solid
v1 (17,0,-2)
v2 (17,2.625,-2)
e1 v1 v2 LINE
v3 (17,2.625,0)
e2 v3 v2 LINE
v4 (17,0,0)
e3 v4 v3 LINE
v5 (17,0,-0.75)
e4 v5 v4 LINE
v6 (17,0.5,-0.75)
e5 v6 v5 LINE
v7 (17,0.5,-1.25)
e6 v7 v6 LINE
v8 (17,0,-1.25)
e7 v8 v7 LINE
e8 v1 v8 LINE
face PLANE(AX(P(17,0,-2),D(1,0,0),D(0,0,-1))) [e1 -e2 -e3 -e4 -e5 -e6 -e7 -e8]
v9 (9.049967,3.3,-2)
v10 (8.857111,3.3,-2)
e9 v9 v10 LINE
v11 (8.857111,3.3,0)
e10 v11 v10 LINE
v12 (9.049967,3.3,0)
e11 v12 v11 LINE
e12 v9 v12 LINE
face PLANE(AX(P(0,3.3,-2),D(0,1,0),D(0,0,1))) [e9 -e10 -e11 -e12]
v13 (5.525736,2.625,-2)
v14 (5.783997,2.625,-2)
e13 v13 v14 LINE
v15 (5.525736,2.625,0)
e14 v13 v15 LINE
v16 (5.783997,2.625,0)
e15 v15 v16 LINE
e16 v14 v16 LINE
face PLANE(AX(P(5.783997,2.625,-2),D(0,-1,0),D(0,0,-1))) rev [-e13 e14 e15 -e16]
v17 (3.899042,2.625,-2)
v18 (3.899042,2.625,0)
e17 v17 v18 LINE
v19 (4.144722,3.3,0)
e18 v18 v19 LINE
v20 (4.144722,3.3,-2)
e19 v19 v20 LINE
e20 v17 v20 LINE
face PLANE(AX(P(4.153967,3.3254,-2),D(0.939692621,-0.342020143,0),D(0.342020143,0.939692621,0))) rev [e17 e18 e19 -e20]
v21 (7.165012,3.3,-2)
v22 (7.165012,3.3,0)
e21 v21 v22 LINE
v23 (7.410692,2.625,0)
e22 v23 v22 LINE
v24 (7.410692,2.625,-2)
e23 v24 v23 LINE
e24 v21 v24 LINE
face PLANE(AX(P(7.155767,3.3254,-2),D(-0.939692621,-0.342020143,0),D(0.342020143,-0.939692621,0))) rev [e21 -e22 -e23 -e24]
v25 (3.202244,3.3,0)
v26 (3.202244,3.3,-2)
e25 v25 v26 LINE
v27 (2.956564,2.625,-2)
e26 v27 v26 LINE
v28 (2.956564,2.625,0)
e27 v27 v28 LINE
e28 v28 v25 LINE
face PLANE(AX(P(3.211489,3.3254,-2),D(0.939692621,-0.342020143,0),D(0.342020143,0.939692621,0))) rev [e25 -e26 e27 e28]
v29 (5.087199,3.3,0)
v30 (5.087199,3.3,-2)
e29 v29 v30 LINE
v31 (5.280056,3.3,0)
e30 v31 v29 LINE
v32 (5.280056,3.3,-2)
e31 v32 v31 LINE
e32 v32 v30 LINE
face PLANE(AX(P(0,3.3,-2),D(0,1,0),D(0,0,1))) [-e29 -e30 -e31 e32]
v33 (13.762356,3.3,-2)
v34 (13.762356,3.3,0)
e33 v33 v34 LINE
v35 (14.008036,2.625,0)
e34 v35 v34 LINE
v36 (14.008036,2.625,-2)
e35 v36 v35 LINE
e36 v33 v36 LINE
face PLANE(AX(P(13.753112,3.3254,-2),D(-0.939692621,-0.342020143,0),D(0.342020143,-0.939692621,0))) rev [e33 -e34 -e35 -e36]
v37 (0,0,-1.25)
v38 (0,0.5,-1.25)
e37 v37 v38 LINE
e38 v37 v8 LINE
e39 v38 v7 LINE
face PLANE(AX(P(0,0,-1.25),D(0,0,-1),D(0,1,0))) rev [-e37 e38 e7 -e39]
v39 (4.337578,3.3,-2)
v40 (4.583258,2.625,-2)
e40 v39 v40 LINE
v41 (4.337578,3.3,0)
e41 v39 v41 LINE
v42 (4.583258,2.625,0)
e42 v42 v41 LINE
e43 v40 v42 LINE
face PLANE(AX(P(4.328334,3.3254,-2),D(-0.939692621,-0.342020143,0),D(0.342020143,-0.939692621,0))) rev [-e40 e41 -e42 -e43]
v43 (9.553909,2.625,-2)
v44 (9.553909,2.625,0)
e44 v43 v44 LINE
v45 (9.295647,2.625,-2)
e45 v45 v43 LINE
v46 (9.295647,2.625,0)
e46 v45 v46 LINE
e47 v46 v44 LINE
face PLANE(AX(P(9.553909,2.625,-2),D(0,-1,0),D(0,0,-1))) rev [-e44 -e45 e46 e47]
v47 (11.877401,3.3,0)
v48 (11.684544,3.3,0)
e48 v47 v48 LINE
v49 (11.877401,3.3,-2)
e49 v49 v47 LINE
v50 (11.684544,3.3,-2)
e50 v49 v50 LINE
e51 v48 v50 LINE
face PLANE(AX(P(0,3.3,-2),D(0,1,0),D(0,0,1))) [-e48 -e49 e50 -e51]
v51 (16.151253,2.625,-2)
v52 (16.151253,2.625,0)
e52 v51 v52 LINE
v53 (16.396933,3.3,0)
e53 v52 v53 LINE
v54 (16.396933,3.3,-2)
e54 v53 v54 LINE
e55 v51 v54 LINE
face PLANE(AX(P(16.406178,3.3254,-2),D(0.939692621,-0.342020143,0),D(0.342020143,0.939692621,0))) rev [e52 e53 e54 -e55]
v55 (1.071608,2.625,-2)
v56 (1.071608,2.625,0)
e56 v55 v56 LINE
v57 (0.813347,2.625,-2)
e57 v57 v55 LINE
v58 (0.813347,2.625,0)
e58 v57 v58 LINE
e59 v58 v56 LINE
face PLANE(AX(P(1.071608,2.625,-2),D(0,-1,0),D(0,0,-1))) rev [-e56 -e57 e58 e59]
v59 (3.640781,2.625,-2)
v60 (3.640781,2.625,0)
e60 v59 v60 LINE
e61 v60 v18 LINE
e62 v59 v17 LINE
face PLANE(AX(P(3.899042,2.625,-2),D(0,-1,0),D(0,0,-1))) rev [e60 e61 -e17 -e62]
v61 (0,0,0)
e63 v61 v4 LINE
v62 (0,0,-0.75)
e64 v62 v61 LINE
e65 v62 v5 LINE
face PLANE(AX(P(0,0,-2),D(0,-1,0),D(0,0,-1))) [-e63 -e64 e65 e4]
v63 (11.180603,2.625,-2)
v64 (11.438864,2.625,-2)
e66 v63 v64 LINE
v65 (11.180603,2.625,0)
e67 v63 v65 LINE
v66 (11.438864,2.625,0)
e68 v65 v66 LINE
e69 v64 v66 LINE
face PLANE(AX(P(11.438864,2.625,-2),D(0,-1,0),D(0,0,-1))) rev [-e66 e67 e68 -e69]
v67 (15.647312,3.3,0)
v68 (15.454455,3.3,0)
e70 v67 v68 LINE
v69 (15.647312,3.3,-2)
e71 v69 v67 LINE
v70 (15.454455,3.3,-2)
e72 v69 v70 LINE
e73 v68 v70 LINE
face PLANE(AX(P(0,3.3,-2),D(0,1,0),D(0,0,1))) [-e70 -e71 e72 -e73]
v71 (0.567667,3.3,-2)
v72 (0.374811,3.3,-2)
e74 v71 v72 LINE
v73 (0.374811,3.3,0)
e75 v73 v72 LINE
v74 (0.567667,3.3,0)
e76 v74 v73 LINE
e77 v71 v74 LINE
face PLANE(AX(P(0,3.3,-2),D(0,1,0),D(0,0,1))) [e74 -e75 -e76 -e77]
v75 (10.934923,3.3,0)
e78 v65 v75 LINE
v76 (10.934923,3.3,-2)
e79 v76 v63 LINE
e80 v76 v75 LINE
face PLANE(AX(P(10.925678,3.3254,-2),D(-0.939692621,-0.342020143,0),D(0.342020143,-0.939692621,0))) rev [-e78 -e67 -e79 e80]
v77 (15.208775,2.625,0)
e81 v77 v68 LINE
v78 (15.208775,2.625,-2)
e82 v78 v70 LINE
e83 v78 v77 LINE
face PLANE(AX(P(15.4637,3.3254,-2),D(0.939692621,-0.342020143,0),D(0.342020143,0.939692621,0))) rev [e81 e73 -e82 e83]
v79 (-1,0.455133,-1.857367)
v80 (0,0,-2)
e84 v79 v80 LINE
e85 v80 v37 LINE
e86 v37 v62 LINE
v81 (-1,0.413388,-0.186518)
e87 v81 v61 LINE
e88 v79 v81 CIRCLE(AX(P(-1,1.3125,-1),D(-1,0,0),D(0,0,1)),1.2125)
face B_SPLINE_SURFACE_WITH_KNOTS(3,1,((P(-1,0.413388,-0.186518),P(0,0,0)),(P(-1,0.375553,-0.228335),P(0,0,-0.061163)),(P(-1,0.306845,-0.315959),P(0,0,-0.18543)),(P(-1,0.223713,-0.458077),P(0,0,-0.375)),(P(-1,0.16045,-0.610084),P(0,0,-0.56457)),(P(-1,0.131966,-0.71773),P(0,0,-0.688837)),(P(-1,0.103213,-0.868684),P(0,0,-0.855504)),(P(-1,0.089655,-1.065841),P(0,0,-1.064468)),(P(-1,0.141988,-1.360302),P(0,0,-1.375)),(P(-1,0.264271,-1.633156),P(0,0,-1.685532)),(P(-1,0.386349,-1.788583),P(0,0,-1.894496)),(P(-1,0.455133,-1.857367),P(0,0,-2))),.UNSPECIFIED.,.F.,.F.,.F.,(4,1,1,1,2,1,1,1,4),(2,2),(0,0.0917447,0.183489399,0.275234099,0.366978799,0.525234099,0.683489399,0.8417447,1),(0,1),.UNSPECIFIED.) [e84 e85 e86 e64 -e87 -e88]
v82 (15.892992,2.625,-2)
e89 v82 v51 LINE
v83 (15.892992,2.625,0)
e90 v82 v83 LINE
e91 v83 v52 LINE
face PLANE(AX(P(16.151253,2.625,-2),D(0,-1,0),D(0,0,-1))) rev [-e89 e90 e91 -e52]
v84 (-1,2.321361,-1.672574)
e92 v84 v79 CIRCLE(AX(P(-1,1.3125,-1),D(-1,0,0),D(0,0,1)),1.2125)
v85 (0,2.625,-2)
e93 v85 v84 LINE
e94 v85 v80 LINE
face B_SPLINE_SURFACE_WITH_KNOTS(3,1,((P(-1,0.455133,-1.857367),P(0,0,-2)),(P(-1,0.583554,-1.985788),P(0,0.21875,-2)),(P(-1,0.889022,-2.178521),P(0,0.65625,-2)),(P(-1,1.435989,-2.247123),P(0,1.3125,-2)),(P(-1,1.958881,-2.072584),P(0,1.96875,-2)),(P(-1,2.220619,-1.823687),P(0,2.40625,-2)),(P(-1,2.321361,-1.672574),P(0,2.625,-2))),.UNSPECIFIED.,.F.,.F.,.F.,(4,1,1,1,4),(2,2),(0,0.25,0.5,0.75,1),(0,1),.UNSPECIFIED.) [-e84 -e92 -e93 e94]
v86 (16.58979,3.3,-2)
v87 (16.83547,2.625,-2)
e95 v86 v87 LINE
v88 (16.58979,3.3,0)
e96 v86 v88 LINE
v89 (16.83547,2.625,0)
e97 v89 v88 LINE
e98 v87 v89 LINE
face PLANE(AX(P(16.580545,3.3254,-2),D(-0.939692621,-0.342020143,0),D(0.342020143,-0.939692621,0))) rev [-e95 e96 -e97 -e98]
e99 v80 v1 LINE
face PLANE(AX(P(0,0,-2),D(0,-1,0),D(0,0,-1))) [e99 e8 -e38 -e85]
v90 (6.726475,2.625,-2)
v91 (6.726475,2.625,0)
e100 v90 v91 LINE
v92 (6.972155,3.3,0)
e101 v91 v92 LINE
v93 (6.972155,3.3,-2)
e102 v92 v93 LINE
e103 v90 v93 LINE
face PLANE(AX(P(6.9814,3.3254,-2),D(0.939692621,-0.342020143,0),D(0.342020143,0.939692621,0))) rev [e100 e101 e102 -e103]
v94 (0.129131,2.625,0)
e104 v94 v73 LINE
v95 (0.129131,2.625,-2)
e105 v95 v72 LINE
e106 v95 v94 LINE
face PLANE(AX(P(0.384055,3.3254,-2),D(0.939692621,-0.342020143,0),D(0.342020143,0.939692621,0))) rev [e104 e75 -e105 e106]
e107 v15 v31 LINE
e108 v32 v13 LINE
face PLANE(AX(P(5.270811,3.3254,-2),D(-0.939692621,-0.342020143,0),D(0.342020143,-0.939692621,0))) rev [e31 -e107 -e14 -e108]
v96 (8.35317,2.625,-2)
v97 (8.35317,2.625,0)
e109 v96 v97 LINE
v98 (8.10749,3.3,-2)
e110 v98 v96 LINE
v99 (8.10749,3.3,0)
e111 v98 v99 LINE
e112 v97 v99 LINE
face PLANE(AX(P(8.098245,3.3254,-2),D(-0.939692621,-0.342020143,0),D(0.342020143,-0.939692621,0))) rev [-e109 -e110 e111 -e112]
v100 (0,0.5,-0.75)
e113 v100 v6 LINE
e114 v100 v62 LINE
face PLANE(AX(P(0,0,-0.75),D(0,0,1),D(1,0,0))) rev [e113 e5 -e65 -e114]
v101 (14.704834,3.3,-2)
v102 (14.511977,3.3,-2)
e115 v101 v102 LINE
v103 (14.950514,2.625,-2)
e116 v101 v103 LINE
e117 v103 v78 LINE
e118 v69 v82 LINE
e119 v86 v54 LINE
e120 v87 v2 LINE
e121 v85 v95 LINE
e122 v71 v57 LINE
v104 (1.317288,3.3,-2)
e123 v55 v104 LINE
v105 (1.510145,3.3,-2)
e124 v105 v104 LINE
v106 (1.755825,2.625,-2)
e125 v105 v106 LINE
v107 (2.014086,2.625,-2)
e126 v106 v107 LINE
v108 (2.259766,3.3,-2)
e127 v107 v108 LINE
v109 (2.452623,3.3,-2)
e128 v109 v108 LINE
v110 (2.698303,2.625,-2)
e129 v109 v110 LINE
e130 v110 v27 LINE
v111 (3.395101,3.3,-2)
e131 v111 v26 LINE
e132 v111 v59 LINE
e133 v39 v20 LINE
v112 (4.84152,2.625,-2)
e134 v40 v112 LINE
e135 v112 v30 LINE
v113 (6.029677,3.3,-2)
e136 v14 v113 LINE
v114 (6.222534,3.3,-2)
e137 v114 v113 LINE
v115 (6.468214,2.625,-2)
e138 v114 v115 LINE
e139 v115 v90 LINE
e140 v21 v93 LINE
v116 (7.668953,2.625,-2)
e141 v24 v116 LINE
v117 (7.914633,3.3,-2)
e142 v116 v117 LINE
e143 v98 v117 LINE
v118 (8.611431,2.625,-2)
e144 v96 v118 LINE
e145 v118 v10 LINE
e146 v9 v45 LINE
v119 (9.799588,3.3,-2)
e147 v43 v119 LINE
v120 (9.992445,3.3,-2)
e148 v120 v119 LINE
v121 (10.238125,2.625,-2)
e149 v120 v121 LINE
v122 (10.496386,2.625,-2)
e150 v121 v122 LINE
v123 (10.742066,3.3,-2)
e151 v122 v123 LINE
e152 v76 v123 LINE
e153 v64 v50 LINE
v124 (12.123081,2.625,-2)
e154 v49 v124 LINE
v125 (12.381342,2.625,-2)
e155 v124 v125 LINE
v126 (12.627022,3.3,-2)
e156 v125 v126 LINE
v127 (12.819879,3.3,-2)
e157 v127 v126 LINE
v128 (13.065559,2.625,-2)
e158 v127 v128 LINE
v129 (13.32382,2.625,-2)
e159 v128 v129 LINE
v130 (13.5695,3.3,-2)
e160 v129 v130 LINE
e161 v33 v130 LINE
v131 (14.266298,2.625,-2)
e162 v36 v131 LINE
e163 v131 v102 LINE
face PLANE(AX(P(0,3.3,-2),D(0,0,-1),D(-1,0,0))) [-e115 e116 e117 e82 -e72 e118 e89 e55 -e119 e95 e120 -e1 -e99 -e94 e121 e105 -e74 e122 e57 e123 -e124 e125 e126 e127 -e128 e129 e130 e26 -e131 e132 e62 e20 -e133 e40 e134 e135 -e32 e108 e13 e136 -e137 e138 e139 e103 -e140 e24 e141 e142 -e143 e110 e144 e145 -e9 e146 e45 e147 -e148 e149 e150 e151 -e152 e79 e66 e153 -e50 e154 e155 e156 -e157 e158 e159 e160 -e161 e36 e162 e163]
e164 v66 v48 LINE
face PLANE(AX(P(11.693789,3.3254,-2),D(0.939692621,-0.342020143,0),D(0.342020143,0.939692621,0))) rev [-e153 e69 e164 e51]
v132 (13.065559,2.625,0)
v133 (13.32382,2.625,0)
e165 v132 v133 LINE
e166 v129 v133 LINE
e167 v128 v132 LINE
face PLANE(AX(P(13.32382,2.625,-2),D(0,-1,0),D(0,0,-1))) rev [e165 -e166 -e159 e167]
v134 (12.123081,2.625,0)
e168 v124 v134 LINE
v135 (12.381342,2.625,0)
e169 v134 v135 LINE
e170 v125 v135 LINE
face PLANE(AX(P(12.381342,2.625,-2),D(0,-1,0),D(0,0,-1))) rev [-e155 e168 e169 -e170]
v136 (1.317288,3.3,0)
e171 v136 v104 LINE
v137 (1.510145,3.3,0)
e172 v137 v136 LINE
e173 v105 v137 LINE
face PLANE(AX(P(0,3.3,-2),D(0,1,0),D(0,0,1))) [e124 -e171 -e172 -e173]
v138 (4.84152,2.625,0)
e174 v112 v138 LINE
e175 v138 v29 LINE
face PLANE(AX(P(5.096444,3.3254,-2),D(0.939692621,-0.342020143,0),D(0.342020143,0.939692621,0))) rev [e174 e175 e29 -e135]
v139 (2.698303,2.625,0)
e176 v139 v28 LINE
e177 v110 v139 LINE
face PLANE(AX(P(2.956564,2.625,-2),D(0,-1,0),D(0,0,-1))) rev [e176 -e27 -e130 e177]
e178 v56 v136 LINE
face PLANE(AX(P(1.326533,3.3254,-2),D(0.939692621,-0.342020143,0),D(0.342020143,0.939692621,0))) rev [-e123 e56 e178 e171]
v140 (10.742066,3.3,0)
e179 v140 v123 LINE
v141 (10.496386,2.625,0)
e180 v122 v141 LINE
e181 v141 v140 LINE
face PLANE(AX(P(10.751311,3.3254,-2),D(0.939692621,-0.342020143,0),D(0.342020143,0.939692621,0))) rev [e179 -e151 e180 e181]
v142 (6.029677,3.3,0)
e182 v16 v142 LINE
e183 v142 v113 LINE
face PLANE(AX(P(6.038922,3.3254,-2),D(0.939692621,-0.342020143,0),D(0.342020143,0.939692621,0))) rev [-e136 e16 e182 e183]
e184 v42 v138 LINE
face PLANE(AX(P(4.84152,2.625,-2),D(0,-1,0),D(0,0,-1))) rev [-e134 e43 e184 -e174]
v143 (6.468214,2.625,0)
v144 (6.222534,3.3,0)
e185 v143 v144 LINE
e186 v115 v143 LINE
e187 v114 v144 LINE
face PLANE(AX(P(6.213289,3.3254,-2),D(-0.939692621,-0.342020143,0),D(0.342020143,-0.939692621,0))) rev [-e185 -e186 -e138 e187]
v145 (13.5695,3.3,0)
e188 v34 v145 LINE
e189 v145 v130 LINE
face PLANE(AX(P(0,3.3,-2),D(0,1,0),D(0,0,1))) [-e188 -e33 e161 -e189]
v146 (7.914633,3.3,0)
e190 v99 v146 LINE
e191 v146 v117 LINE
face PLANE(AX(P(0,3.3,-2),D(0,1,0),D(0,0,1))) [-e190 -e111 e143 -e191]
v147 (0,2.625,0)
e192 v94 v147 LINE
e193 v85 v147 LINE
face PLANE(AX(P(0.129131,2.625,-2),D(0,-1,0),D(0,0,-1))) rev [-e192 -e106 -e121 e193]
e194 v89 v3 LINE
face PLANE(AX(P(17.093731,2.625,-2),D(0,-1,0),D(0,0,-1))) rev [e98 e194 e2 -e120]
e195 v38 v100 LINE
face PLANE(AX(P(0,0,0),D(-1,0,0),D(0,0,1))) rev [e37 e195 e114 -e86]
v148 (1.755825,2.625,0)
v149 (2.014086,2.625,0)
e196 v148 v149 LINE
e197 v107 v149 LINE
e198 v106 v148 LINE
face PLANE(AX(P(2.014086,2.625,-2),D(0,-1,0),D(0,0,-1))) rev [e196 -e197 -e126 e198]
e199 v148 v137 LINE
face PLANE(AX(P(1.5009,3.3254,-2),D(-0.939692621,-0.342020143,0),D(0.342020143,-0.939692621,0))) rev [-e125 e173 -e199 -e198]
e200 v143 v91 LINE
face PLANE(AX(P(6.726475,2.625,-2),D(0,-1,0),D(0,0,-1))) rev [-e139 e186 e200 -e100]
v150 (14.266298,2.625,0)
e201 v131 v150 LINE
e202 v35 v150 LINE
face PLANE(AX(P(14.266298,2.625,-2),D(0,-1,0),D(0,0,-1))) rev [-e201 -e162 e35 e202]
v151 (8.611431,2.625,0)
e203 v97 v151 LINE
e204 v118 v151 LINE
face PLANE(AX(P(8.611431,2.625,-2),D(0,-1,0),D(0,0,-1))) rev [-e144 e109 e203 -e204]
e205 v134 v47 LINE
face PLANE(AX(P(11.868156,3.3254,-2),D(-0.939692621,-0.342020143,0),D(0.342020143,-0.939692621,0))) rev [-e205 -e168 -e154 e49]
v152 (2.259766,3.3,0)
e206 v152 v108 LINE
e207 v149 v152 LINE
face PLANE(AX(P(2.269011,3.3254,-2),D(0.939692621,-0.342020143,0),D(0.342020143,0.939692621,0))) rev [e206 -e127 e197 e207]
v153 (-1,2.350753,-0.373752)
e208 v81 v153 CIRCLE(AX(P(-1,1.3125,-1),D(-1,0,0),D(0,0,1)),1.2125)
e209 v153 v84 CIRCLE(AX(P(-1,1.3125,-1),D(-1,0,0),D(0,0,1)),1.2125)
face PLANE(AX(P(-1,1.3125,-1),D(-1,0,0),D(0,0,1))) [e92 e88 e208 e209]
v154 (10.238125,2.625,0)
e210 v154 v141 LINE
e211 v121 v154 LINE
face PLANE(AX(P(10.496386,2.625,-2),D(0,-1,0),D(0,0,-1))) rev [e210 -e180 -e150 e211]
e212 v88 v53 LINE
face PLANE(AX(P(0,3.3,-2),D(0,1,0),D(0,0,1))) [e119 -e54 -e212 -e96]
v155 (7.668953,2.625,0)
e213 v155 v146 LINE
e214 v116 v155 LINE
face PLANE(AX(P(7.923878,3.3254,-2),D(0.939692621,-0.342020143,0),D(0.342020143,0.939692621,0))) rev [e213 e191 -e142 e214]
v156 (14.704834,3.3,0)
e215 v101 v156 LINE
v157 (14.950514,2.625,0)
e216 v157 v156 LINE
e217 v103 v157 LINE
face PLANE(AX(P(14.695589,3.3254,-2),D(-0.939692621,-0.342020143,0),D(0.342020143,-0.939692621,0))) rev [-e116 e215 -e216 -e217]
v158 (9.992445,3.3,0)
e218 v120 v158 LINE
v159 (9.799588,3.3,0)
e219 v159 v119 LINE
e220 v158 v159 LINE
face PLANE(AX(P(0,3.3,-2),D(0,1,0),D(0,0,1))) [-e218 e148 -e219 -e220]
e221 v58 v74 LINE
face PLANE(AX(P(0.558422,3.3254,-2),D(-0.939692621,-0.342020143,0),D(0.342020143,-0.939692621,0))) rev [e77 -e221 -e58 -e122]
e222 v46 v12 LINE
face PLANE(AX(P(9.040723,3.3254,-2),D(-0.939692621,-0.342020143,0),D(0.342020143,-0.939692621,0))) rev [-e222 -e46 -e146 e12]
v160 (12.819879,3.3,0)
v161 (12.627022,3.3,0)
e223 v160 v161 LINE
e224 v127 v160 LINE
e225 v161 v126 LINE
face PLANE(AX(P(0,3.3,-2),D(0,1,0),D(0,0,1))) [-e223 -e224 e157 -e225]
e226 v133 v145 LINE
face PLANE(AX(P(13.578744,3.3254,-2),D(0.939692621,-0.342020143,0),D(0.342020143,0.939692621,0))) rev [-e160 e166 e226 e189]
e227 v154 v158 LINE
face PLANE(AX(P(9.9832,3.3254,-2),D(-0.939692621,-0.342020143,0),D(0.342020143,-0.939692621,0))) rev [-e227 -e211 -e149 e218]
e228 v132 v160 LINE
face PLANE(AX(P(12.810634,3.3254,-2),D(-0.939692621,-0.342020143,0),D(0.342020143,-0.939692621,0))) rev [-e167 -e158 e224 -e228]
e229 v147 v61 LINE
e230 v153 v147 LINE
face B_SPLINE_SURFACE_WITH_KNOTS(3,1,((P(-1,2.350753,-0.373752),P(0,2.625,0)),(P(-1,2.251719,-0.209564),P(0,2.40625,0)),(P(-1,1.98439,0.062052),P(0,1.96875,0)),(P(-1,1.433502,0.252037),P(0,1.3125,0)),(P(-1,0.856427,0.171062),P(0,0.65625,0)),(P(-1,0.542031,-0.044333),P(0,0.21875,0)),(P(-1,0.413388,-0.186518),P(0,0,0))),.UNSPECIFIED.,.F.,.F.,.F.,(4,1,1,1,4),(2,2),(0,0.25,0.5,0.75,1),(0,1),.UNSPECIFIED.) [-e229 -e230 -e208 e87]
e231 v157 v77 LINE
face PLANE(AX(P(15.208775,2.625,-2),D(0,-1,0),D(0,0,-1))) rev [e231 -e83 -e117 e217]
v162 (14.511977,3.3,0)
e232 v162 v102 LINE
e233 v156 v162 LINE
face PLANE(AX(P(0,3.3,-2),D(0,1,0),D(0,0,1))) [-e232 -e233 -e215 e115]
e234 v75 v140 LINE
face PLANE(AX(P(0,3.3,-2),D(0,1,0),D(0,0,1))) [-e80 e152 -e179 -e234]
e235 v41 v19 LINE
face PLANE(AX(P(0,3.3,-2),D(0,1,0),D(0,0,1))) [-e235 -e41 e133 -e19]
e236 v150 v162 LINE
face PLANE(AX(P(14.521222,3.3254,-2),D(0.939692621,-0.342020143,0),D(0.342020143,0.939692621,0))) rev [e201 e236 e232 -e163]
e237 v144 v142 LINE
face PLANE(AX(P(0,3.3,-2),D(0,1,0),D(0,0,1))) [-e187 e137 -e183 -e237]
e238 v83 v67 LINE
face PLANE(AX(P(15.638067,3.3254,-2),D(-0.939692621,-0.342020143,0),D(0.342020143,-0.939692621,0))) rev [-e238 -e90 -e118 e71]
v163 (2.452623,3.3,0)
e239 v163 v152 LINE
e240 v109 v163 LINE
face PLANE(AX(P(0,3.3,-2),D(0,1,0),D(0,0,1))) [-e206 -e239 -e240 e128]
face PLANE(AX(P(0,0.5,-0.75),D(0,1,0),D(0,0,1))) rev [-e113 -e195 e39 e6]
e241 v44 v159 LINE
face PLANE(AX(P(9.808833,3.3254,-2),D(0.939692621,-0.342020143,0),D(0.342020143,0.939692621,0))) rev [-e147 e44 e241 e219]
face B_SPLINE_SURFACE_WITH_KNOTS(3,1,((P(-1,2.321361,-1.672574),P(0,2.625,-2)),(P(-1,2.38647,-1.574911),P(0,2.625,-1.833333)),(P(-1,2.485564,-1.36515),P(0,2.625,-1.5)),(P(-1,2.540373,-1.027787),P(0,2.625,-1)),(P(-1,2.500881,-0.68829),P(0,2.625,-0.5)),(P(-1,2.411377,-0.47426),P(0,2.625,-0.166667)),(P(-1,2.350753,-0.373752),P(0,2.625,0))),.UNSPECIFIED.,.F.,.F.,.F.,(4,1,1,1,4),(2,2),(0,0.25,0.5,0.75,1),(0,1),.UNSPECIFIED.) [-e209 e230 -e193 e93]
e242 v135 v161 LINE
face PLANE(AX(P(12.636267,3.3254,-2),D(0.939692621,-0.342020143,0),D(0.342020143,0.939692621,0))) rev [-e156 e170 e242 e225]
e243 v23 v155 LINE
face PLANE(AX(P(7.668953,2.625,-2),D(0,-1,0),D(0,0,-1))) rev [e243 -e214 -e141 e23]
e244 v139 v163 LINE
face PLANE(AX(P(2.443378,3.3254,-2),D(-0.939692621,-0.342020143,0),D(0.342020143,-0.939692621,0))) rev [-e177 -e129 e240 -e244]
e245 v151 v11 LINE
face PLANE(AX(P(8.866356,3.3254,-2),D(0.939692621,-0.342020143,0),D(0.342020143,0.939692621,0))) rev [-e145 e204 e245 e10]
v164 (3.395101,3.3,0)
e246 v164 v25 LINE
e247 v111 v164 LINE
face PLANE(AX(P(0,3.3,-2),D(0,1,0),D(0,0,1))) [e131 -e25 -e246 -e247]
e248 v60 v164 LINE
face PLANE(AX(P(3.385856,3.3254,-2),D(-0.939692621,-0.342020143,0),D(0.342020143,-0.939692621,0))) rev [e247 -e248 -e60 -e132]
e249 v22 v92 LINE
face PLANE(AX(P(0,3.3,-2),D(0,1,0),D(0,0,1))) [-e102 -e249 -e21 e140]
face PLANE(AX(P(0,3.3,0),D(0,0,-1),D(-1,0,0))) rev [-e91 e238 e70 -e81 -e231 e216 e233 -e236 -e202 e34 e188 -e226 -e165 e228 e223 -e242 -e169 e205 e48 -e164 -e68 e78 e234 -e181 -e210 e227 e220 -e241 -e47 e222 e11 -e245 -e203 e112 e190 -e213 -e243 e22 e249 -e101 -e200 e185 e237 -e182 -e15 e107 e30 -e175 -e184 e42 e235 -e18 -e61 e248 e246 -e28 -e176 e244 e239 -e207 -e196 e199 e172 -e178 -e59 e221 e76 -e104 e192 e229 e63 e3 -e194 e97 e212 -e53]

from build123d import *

# Parameters (mm, degrees)
BLANKSKE_W         = 17
BLANKSKE_H         = 3.3
BLANK_DEPTH        = 2
TOOTHCUTSIM_DEPTH  = 18.432441022
TEETHCUTS_COUNT    = 19
TEETHCUTS_PITCH    = 0.942477795
SKETCH1_W          = 0.5
SKETCH1_H          = 0.5
CUT_EXTRUDE1_DEPTH = 18.432441022


with BuildPart() as part:
    # BlankSke → Blank (new body)
    with BuildSketch(Plane.XY):
        with Locations((8.5, 1.65)):
            Rectangle(BLANKSKE_W, BLANKSKE_H)
    extrude(amount=-BLANK_DEPTH)

    # TooCutSkeSim → ToothCutSim (cut, through all)
    with BuildSketch(Plane.XY):
        Polygon((0.129130611, 2.625), (-0.129130611, 2.625), (-0.384055363, 3.3254), (0.384055363, 3.3254), align=None)
    toothcutsim = extrude(amount=-TOOTHCUTSIM_DEPTH, mode=Mode.SUBTRACT)

    # TeethCuts: ToothCutSim ×19
    with Locations(*[(i * TEETHCUTS_PITCH, 0, 0) for i in range(1, TEETHCUTS_COUNT)]):
        add(toothcutsim, mode=Mode.SUBTRACT)

    # Sketch1 → Cut-Extrude1 (cut, through all)
    with BuildSketch(Plane(origin=(17, 0, 0), x_dir=(0, 0, -1), z_dir=(1, 0, 0))):
        with Locations((1, 0.25)):
            Rectangle(SKETCH1_W, SKETCH1_H)
    extrude(amount=-CUT_EXTRUDE1_DEPTH, mode=Mode.SUBTRACT)

    # Loft1: read off the stored shape, not the designer's step
    # Loft1: loft between two sections, ruled curve by curve
    loft1_from = [
        Edge.make_bspline([(-1, 2.321360982, -1.672573988), (-1, 2.386469579, -1.574911092), (-1, 2.485564206, -1.365149558), (-1, 2.540372571, -1.027786651), (-1, 2.500881486, -0.688289756), (-1, 2.411377214, -0.474260245), (-1, 2.350753212, -0.373752031)], [0, 0, 0, 0, 0.25, 0.5, 0.75, 1, 1, 1, 1], 3),
        Edge.make_bspline([(-1, 2.350753212, -0.373752031), (-1, 2.25171936, -0.20956433), (-1, 1.98438986, 0.062051662), (-1, 1.433501665, 0.252036945), (-1, 0.856426864, 0.171062344), (-1, 0.542030673, -0.044333441), (-1, 0.413387868, -0.186517595)], [0, 0, 0, 0, 0.25, 0.5, 0.75, 1, 1, 1, 1], 3),
        Edge.make_bspline([(-1, 0.455133028, -1.857366972), (-1, 0.583554487, -1.985788432), (-1, 0.889022109, -2.17852057), (-1, 1.435989481, -2.247122683), (-1, 1.958881136, -2.07258365), (-1, 2.220618901, -1.82368711), (-1, 2.321360982, -1.672573988)], [0, 0, 0, 0, 0.25, 0.5, 0.75, 1, 1, 1, 1], 3),
        Edge.make_bspline([(-1, 0.413387868, -0.186517595), (-1, 0.375553122, -0.228334946), (-1, 0.306844772, -0.315959172), (-1, 0.223712602, -0.45807693), (-1, 0.160449665, -0.610084219), (-1, 0.131966282, -0.717729651), (-1, 0.103213139, -0.868683652), (-1, 0.089654768, -1.065841054), (-1, 0.141987611, -1.360301974), (-1, 0.264270675, -1.633156172), (-1, 0.386349144, -1.788583089), (-1, 0.455133028, -1.857366972)], [0, 0, 0, 0, 0.0917447, 0.183489399, 0.275234099, 0.366978799, 0.366978799, 0.525234099, 0.683489399, 0.8417447, 1, 1, 1, 1], 3),
    ]
    loft1_to = [
        Edge.make_bspline([(0, 2.625, -2), (0, 2.625, -1.833333333), (0, 2.625, -1.5), (0, 2.625, -1), (0, 2.625, -0.5), (0, 2.625, -0.166666667), (0, 2.625, 0)], [0, 0, 0, 0, 0.25, 0.5, 0.75, 1, 1, 1, 1], 3),
        Edge.make_bspline([(0, 2.625, 0), (0, 2.40625, 0), (0, 1.96875, 0), (0, 1.3125, 0), (0, 0.65625, 0), (0, 0.21875, 0), (0, 0, 0)], [0, 0, 0, 0, 0.25, 0.5, 0.75, 1, 1, 1, 1], 3),
        Edge.make_bspline([(0, 0, -2), (0, 0.21875, -2), (0, 0.65625, -2), (0, 1.3125, -2), (0, 1.96875, -2), (0, 2.40625, -2), (0, 2.625, -2)], [0, 0, 0, 0, 0.25, 0.5, 0.75, 1, 1, 1, 1], 3),
        Edge.make_bspline([(0, 0, 0), (0, 0, -0.061163133), (0, 0, -0.185429777), (0, 0, -0.375), (0, 0, -0.564570223), (0, 0, -0.688836867), (0, 0, -0.855503534), (0, 0, -1.064467717), (0, 0, -1.375), (0, 0, -1.685532283), (0, 0, -1.894496466), (0, 0, -2)], [0, 0, 0, 0, 0.0917447, 0.183489399, 0.275234099, 0.366978799, 0.366978799, 0.525234099, 0.683489399, 0.8417447, 1, 1, 1, 1], 3),
    ]
    loft1 = Solid(Shell([*[Face.make_surface_from_curves(loft1_from[k], loft1_to[k]) for k in range(4)], Face(Wire(loft1_from)), Face(Wire(loft1_to))]))
    add(loft1)


solid = part.part
